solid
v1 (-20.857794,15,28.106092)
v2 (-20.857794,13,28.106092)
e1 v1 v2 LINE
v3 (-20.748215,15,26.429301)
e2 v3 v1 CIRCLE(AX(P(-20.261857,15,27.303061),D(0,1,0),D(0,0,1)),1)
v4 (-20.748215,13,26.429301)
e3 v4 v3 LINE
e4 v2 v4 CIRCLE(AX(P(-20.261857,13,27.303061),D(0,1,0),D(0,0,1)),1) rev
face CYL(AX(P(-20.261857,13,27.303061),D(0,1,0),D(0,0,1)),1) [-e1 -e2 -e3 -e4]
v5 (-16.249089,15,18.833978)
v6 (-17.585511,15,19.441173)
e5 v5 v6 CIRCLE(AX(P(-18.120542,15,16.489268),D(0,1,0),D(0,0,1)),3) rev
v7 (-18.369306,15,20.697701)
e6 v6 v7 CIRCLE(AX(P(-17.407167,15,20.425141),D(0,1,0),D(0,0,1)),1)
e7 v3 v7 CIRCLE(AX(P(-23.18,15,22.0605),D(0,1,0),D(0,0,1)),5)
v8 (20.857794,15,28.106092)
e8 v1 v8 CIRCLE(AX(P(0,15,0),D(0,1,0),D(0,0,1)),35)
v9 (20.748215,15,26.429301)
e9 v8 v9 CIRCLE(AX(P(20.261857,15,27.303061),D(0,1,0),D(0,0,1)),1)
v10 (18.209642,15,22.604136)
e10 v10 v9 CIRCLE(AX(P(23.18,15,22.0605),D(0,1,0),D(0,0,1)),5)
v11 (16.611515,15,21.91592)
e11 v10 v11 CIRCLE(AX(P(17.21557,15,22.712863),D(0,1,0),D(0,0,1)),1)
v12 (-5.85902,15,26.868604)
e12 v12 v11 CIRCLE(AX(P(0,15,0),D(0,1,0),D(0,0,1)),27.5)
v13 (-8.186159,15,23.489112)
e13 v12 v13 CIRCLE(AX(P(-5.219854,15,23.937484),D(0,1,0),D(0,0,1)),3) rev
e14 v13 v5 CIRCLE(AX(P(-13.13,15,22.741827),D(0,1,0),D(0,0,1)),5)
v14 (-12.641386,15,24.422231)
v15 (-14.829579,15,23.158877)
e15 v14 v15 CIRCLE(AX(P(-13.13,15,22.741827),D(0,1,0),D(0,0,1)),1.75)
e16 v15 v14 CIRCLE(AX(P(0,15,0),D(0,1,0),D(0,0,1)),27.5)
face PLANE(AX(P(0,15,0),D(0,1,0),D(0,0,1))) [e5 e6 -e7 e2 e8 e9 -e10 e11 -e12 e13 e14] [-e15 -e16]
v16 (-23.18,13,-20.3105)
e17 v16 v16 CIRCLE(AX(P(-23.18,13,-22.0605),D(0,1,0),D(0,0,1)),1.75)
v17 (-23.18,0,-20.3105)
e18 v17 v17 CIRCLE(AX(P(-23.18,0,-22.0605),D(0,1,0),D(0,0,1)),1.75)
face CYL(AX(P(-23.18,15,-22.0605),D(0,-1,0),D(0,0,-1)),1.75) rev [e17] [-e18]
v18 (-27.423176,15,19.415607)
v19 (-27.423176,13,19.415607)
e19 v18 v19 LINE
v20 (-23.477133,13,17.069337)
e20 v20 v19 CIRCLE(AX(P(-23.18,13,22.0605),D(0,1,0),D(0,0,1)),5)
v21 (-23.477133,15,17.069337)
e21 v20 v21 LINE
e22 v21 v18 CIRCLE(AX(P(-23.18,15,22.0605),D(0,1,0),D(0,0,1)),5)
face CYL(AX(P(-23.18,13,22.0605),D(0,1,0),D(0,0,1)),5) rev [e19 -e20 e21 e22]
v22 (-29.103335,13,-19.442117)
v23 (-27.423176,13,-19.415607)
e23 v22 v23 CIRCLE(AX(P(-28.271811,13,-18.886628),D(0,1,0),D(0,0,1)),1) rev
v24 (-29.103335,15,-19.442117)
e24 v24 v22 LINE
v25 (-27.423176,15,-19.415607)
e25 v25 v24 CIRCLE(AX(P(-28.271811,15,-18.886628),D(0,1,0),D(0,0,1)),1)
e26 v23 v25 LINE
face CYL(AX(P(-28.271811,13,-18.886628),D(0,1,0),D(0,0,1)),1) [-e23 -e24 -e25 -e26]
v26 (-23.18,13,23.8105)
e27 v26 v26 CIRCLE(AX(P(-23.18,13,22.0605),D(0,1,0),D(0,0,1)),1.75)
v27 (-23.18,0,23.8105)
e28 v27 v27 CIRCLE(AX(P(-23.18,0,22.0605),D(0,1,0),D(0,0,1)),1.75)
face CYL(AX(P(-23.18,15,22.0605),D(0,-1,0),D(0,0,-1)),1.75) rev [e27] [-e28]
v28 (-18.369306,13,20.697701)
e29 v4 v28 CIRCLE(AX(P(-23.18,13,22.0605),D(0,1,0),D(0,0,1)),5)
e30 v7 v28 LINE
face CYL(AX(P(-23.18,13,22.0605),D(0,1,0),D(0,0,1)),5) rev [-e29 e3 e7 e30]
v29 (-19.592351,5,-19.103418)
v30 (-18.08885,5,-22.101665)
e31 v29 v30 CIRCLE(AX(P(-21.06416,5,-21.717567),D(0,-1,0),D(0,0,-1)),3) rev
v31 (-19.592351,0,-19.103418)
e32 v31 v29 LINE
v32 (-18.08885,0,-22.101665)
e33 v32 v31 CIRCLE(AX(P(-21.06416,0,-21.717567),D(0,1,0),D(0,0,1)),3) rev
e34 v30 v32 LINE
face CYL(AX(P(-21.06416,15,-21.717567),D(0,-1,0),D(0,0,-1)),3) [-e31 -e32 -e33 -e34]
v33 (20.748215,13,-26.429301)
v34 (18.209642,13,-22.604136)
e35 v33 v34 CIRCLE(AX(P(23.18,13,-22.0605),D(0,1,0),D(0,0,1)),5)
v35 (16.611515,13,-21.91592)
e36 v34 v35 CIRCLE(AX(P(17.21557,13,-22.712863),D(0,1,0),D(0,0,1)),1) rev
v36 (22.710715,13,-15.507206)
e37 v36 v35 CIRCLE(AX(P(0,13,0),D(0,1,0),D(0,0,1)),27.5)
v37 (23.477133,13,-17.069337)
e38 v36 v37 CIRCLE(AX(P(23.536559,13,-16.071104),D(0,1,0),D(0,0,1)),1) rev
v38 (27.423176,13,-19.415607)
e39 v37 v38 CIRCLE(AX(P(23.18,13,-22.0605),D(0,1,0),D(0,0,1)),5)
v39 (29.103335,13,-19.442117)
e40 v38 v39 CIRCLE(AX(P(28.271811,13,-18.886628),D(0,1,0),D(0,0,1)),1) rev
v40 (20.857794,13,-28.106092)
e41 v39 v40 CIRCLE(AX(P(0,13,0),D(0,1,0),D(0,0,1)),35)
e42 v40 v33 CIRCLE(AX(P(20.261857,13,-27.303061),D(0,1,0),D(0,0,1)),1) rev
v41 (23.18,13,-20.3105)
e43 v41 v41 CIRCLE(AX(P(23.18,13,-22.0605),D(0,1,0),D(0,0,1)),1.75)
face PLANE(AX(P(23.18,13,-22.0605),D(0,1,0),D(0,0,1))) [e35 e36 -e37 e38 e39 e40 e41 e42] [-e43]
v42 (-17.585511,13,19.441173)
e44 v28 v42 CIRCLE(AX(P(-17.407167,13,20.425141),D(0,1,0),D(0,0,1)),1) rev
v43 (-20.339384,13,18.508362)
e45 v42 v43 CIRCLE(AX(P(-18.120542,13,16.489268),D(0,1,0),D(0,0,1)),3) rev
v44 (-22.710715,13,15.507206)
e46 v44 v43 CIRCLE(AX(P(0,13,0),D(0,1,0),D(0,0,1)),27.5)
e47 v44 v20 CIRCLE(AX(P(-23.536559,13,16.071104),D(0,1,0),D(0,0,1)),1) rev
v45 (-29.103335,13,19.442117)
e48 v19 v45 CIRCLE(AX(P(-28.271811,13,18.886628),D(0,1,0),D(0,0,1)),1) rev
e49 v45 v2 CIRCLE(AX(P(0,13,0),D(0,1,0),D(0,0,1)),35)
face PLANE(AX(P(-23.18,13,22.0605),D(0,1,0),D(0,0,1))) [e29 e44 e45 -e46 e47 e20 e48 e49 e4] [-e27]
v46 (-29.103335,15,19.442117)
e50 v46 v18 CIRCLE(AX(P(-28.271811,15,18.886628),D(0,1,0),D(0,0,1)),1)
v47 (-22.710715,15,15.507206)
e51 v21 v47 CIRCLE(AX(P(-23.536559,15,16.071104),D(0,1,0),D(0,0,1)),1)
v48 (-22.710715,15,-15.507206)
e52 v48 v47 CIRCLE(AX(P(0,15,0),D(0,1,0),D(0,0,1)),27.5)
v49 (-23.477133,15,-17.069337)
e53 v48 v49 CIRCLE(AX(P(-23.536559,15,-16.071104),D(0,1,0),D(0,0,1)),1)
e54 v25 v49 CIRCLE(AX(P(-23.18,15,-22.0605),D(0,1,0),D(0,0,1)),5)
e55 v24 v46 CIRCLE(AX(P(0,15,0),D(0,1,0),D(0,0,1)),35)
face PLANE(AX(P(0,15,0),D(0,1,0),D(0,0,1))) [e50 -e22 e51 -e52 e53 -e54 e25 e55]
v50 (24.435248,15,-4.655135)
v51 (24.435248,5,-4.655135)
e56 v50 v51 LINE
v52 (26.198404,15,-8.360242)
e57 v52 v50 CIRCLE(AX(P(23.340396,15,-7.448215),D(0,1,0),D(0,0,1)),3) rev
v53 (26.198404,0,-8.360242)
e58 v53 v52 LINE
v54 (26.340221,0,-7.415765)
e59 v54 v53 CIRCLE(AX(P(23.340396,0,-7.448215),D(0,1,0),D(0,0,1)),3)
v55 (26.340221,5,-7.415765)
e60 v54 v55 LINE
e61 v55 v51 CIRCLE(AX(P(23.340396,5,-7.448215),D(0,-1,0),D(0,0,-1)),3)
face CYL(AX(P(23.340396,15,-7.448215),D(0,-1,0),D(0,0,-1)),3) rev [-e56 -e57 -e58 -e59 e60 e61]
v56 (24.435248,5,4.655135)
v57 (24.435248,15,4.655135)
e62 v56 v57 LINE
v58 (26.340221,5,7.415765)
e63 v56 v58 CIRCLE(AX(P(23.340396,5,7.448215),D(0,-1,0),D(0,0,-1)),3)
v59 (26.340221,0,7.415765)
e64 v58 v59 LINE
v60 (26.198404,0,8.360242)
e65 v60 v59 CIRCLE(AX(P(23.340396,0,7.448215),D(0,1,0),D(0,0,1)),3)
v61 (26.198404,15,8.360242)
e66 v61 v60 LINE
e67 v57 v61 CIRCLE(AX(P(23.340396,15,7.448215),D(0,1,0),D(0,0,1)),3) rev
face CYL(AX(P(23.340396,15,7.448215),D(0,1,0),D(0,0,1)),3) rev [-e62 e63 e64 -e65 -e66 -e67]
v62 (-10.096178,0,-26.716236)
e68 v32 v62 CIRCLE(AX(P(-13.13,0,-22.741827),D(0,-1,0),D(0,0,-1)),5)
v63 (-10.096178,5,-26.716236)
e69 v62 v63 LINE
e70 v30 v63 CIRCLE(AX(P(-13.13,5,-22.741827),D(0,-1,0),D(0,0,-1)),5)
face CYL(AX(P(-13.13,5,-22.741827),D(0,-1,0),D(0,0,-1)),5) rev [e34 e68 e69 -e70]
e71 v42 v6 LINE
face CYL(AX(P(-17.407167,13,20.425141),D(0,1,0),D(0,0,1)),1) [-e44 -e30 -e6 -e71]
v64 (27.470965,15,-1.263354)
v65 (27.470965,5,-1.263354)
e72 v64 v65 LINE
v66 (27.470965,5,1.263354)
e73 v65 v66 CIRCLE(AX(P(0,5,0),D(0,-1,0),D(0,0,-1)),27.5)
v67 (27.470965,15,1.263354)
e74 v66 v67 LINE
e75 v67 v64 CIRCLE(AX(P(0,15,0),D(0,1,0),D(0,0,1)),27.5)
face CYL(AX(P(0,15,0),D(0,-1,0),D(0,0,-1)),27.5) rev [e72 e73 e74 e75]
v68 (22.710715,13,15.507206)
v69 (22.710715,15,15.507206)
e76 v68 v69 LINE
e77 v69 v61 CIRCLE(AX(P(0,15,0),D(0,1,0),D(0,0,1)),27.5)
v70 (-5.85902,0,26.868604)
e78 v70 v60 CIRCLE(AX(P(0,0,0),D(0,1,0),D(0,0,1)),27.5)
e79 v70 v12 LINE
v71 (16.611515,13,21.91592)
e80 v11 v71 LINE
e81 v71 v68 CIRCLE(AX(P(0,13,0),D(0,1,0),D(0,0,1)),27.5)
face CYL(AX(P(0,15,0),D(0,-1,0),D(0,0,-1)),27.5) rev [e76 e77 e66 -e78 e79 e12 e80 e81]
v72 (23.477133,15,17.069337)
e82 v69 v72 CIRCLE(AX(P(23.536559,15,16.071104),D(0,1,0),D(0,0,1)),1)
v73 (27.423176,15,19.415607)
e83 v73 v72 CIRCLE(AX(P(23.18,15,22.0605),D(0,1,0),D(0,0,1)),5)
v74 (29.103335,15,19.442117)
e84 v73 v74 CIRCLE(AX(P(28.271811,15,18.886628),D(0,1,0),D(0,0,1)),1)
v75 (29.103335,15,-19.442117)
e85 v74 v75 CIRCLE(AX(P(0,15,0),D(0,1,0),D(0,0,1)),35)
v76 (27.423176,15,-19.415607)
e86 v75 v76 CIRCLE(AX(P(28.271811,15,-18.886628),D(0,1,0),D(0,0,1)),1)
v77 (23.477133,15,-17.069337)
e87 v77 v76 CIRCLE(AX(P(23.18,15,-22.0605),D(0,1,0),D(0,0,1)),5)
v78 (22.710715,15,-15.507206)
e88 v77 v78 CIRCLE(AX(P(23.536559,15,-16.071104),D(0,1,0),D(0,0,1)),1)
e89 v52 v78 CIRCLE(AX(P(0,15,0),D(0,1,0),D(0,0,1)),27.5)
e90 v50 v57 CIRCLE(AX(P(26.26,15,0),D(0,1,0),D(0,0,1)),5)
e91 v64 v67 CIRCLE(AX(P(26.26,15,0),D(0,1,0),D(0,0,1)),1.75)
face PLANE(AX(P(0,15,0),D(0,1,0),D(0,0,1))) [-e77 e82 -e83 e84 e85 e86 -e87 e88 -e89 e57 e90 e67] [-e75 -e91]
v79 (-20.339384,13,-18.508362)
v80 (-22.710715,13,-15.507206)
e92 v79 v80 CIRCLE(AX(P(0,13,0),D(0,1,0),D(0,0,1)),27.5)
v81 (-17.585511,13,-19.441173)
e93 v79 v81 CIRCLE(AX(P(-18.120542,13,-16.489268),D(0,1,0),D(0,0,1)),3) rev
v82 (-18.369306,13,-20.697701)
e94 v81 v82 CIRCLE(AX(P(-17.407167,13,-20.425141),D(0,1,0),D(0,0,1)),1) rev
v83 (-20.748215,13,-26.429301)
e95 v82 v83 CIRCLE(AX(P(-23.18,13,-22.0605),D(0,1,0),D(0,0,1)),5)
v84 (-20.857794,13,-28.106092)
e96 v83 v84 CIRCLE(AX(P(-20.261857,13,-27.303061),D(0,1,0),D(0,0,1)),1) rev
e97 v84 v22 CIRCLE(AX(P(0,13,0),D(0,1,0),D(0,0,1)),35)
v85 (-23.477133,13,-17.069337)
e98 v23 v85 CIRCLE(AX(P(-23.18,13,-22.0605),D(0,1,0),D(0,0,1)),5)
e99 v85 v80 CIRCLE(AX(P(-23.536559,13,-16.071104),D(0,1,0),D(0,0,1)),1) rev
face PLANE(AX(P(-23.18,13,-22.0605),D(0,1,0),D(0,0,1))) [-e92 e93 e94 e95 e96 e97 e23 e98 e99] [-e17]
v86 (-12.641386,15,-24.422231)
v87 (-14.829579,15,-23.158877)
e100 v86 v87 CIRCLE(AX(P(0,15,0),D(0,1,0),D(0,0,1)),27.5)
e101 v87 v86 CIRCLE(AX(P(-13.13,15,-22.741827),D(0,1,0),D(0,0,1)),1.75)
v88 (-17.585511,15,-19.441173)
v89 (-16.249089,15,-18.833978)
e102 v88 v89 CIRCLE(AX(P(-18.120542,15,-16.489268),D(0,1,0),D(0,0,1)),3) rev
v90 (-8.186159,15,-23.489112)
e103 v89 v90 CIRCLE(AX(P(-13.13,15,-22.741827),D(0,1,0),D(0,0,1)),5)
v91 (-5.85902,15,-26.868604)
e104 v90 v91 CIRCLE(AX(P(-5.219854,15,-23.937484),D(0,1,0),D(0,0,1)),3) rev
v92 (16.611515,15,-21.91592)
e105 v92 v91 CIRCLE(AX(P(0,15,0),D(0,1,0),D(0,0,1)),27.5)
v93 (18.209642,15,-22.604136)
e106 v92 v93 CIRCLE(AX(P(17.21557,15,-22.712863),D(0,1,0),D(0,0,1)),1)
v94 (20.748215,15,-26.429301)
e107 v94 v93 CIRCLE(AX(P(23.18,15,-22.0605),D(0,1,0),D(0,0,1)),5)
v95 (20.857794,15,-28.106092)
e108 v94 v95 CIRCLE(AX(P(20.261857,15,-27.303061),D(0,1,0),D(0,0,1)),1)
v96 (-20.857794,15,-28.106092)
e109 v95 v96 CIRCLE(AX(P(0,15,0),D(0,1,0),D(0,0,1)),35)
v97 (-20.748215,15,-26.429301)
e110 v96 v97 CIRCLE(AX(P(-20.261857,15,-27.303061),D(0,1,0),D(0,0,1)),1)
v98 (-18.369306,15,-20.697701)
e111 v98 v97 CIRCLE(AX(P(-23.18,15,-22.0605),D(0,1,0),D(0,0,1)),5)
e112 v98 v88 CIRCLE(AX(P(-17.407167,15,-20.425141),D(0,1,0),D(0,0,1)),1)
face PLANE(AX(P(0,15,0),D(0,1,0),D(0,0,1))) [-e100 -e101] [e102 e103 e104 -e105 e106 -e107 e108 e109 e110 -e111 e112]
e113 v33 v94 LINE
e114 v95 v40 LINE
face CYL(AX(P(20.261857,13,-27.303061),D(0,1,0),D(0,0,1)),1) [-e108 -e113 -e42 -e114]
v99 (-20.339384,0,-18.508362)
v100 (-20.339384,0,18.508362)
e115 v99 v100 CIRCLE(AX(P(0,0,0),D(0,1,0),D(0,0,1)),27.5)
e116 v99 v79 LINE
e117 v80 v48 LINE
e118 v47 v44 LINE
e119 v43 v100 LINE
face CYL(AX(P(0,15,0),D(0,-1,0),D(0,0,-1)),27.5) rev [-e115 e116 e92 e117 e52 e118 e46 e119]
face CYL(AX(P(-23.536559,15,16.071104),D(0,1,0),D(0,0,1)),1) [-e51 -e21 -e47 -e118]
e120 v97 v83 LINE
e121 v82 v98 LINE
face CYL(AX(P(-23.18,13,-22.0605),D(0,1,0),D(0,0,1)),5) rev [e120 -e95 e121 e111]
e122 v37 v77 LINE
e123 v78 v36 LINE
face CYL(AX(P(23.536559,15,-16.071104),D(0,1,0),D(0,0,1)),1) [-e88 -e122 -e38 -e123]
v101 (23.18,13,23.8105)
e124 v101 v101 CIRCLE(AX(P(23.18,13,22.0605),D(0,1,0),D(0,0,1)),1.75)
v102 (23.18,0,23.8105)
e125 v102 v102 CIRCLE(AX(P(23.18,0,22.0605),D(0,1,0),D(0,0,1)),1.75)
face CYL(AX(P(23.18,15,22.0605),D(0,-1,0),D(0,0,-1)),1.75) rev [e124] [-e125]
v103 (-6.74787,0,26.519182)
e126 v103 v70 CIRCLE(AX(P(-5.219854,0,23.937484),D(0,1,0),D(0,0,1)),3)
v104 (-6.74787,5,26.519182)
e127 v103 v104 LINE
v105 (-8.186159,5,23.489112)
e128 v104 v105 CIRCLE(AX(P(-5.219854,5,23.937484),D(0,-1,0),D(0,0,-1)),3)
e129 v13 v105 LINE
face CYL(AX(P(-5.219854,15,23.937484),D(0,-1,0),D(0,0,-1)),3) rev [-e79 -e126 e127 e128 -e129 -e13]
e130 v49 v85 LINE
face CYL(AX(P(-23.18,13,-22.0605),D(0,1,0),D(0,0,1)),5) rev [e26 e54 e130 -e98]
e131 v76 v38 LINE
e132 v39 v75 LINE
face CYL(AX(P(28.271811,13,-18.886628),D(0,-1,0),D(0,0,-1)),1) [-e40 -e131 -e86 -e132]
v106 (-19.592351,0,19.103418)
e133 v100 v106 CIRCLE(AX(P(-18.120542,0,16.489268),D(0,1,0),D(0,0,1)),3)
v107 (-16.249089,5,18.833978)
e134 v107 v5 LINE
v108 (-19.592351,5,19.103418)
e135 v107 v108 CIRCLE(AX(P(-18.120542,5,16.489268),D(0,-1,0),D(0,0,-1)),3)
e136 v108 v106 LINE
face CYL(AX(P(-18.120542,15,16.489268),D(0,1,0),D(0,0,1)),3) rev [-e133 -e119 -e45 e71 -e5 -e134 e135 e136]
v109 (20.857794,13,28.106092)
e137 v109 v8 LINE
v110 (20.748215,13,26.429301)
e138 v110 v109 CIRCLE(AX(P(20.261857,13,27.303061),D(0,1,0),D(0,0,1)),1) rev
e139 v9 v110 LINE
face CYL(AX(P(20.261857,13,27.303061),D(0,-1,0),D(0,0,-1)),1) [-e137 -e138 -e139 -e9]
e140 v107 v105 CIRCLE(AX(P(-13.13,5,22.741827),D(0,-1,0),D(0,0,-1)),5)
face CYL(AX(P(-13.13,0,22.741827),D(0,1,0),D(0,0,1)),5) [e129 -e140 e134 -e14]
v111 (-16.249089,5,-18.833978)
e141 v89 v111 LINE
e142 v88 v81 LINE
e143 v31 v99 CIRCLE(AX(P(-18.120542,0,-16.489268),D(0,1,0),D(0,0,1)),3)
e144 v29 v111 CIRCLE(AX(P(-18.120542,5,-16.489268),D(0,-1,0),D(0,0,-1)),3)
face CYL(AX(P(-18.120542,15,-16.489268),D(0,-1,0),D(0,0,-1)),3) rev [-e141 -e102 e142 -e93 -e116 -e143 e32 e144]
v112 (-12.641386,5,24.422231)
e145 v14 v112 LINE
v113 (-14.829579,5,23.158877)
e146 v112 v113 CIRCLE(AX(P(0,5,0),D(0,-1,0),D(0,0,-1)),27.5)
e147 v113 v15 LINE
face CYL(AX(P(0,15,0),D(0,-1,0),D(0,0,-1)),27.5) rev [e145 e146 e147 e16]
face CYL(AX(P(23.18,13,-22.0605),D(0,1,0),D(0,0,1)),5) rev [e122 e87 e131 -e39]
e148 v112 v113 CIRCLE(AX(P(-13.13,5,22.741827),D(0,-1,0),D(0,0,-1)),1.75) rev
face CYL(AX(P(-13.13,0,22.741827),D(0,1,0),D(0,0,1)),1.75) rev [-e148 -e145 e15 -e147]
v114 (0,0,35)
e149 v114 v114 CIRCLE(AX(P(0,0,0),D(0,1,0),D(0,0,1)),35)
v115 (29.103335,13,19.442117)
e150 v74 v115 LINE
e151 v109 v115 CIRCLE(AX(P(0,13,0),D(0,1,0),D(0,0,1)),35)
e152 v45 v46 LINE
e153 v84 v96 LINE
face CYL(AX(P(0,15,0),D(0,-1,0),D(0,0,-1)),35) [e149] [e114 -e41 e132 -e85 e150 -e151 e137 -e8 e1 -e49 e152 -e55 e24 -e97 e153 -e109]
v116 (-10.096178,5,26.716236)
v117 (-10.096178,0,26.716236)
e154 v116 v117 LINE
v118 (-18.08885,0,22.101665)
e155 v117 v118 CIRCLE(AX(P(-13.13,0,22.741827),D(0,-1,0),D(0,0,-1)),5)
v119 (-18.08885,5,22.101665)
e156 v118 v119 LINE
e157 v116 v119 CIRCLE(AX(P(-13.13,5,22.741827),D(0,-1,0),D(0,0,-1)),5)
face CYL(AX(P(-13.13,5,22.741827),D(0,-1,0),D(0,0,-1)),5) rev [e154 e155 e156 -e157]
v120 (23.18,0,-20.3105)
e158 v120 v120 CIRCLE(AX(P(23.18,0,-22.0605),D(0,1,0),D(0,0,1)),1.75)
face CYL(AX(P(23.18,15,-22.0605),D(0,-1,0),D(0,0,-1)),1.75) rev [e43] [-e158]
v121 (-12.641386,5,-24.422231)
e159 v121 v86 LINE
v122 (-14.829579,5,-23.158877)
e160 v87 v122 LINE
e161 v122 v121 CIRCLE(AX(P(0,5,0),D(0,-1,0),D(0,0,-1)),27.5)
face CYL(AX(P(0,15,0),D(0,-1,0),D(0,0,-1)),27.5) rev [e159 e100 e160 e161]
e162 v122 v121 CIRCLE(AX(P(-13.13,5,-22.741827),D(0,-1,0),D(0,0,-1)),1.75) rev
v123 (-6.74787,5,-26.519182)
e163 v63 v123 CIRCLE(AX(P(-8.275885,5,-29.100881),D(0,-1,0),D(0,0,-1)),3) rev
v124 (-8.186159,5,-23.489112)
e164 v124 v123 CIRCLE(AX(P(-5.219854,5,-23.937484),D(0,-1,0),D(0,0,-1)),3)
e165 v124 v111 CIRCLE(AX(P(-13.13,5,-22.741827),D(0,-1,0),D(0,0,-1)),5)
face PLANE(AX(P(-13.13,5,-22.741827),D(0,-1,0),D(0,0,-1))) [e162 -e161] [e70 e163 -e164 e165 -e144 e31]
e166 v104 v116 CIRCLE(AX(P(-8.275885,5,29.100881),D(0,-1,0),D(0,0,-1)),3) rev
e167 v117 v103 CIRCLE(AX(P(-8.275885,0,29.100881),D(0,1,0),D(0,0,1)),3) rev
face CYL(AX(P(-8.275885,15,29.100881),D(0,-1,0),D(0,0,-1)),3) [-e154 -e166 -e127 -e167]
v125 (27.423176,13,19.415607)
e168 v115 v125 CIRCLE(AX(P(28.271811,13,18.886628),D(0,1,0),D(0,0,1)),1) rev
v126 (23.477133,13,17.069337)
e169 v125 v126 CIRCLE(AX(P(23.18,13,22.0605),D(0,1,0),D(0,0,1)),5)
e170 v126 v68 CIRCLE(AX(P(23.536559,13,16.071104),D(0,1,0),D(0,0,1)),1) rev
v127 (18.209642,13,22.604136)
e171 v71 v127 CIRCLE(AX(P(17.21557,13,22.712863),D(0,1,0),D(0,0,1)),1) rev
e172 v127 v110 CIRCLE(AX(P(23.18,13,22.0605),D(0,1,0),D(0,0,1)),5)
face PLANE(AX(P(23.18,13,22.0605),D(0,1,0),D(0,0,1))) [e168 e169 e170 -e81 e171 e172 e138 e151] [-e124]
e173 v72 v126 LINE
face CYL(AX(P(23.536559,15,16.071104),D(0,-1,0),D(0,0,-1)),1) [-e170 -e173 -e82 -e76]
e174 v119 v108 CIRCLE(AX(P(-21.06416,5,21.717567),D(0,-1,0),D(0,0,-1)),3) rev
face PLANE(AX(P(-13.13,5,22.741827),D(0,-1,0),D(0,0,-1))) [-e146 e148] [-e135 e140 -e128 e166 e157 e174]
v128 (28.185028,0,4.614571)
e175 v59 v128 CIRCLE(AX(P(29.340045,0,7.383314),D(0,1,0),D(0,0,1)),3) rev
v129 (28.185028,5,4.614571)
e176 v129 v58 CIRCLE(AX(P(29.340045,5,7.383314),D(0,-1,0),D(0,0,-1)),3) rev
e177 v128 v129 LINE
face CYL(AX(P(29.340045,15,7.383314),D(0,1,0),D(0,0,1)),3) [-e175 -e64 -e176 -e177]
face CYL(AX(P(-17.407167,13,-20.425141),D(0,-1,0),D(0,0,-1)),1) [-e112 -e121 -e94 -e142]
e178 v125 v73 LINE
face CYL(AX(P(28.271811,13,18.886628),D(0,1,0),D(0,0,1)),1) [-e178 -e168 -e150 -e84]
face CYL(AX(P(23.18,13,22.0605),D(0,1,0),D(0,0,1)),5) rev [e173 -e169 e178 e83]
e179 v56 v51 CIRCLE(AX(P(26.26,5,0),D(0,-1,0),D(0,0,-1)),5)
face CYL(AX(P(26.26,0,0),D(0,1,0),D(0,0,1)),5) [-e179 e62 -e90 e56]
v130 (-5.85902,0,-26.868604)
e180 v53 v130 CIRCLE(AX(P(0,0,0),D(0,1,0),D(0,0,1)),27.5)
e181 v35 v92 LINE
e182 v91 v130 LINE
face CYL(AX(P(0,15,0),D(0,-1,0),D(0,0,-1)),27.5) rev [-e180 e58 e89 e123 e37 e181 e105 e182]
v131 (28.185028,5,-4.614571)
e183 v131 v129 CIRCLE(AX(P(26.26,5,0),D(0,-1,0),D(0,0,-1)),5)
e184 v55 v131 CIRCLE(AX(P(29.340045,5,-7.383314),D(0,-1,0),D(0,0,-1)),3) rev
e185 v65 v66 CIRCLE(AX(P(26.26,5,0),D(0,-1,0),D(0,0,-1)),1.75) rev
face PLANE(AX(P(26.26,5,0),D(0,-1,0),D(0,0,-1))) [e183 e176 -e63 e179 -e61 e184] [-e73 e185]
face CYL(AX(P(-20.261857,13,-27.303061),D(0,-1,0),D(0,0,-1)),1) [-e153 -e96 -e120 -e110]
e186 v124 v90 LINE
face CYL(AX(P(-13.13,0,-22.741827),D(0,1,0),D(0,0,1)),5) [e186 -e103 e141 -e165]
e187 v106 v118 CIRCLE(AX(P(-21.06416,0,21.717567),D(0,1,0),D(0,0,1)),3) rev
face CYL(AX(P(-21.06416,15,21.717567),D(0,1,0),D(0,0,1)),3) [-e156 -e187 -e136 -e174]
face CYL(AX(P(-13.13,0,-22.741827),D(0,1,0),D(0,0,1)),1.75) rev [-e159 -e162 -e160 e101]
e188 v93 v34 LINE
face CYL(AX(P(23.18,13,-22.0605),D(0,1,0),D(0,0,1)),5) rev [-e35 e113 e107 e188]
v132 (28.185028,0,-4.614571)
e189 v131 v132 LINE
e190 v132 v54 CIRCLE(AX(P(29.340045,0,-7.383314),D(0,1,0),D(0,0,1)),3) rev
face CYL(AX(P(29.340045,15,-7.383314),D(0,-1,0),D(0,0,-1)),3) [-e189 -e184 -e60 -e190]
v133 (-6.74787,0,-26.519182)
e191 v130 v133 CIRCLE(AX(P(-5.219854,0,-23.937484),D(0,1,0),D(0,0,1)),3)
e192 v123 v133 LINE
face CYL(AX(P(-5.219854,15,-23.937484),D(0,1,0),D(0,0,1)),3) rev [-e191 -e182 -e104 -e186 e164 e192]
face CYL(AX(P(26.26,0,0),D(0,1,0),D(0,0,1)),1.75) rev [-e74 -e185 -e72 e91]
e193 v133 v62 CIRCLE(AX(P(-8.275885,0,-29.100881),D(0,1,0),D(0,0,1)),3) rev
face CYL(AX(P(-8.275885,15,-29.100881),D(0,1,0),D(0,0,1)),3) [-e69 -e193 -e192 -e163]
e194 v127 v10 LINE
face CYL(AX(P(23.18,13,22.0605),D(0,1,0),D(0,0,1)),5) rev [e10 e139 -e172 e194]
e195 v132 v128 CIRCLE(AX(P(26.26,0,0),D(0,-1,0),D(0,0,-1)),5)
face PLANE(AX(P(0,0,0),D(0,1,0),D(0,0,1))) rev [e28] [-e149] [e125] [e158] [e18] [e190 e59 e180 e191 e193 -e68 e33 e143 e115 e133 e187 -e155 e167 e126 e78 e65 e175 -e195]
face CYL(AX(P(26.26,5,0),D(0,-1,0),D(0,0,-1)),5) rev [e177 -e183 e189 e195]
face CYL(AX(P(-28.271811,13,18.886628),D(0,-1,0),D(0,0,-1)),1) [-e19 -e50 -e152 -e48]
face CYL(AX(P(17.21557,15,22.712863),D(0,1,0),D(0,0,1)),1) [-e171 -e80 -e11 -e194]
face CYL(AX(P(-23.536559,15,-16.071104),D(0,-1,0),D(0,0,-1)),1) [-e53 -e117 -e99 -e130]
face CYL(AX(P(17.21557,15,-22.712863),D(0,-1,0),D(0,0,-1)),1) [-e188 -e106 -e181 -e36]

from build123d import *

# Parameters (mm, degrees)
SKETCH_1_R          = 35
SKETCH_1_R_2        = 1.75
SKETCH_1_R_3        = 27.5
EXTRUDE_1_DEPTH     = 15
SKETCH_2_R          = 5
SKETCH_2_R_2        = 1.75
EXTRUDE_2_DEPTH     = 15
FILLET_1_R          = 3
SKETCH_3_R          = 5
CUT_EXTRUDE_1_DEPTH = 2
CUT_EXTRUDE_START   = -5
SKETCH_4_R          = 5
CUT_EXTRUDE_2_DEPTH = 5
FILLET_2_DEPTH      = 5
FILLET_3_R          = 1


with BuildPart() as part:
    # Эскиз1 → Бобышка-Вытянуть1 (new body)
    with BuildSketch(Plane(origin=(0, 0, 0), x_dir=(1, 0, 0), z_dir=(0, 1, 0))):
        with Locations(Location((0, 0, 0), (0, 0, 270))):
            Circle(SKETCH_1_R)
        with Locations(Location((-23.18, 22.0605, 0), (0, 0, 270))):
            Circle(SKETCH_1_R_2, mode=Mode.SUBTRACT)
        with Locations(Location((23.18, 22.0605, 0), (0, 0, 270))):
            Circle(SKETCH_1_R_2, mode=Mode.SUBTRACT)
        with Locations(Location((23.18, -22.0605, 0), (0, 0, 270))):
            Circle(SKETCH_1_R_2, mode=Mode.SUBTRACT)
        with Locations(Location((-23.18, -22.0605, 0), (0, 0, 270))):
            Circle(SKETCH_1_R_2, mode=Mode.SUBTRACT)
        with Locations(Location((0, 0, 0), (0, 0, 270))):
            Circle(SKETCH_1_R_3, mode=Mode.SUBTRACT)
    extrude(amount=EXTRUDE_1_DEPTH)

    # Эскиз2 → Бобышка-Вытянуть2 (add)
    # profile 1 of 3: a face of its own
    with BuildSketch(Plane(origin=(0, 15, 0), x_dir=(1, 0, 0), z_dir=(0, 1, 0))):
        with Locations((-13.13, 22.741827103)):
            Circle(SKETCH_2_R)
        with Locations((-13.13, 22.741827103)):
            Circle(SKETCH_2_R_2, mode=Mode.SUBTRACT)
    # profile 2 of 3: a face of its own
    with BuildSketch(Plane(origin=(0, 15, 0), x_dir=(1, 0, 0), z_dir=(0, 1, 0))):
        with Locations((26.26, 0)):
            Circle(SKETCH_2_R)
        with Locations((26.26, 0)):
            Circle(SKETCH_2_R_2, mode=Mode.SUBTRACT)
    # profile 3 of 3: a face of its own
    with BuildSketch(Plane(origin=(0, 15, 0), x_dir=(1, 0, 0), z_dir=(0, 1, 0))):
        with Locations((-13.13, -22.741827103)):
            Circle(SKETCH_2_R)
        with Locations((-13.13, -22.741827103)):
            Circle(SKETCH_2_R_2, mode=Mode.SUBTRACT)
    extrude(amount=-EXTRUDE_2_DEPTH)

    # Скругление1
    fillet_1_edges = [part.edges().sort_by_distance(p)[0] for p in [
        (27.053267327, 7.5, -4.936671647),
        (27.053267327, 7.5, 4.936671647),
        (-17.80191672, 7.5, -20.960480937),
        (-9.251350607, 7.5, -25.897152584),
        (-9.251350607, 7.5, 25.897152584),
        (-17.80191672, 7.5, 20.960480937),
    ]]
    fillet(fillet_1_edges, radius=FILLET_1_R)

    # Эскиз3 → Вырез-Вытянуть1 (cut)
    with BuildSketch(Plane(origin=(0, 15, 0), x_dir=(1, 0, 0), z_dir=(0, 1, 0))):
        with Locations((-23.18, 22.0605)):
            Circle(SKETCH_3_R)
        with Locations((23.18, 22.0605)):
            Circle(SKETCH_3_R)
        with Locations((23.18, -22.0605)):
            Circle(SKETCH_3_R)
        with Locations((-23.18, -22.0605)):
            Circle(SKETCH_3_R)
    extrude(amount=-CUT_EXTRUDE_1_DEPTH, mode=Mode.SUBTRACT)

    # Эскиз4 → Вырез-Вытянуть2 (cut)
    with BuildSketch(Plane.XZ.offset(CUT_EXTRUDE_START)):
        with Locations((-13.13, 22.741827103)):
            Circle(SKETCH_4_R)
        with Locations((26.26, 0)):
            Circle(SKETCH_4_R)
        with Locations((-13.13, -22.741827103)):
            Circle(SKETCH_4_R)
    extrude(amount=CUT_EXTRUDE_2_DEPTH, mode=Mode.SUBTRACT)

    # Скругление2: read off the stored shape, not the designer's step
    # Скругление2 outline → Скругление2 (cut)
    with BuildSketch(Plane(origin=(0, 0, 0), x_dir=(1, 0, 0), z_dir=(0, 1, 0))):
        with BuildLine():
            ThreePointArc((-16.249088608, 18.83397779), (-17.48691602, 20.288812061), (-18.08884989, 22.101664805))
            ThreePointArc((-18.08884989, 22.101664805), (-18.38244619, 20.372795331), (-19.592350799, 19.103417814))
            ThreePointArc((-19.592350799, 19.103417814), (-17.87954729, 19.479572812), (-16.249088608, 18.83397779))
        make_face()
        with BuildLine():
            ThreePointArc((-6.747869727, 26.519182418), (-8.452135208, 26.10606305), (-10.096178242, 26.716235932))
            ThreePointArc((-10.096178242, 26.716235932), (-8.827168648, 25.288519537), (-8.186158917, 23.489112418))
            ThreePointArc((-8.186158917, 23.489112418), (-7.930031265, 25.223928567), (-6.747869727, 26.519182418))
        make_face()
        with BuildLine():
            ThreePointArc((24.435247525, 4.655134628), (26.314084667, 4.999707476), (28.185028132, 4.614571128))
            ThreePointArc((28.185028132, 4.614571128), (26.834581398, 5.733267719), (26.340220525, 7.415764604))
            ThreePointArc((26.340220525, 7.415764604), (25.809578555, 5.744355755), (24.435247525, 4.655134628))
        make_face()
        with BuildLine():
            ThreePointArc((26.340220525, -7.415764604), (26.834581398, -5.733267719), (28.185028132, -4.614571128))
            ThreePointArc((28.185028132, -4.614571128), (26.314084667, -4.999707476), (24.435247525, -4.655134628))
            ThreePointArc((24.435247525, -4.655134628), (25.809578555, -5.744355755), (26.340220525, -7.415764604))
        make_face()
        with BuildLine():
            ThreePointArc((-8.186158917, -23.489112418), (-8.827168648, -25.288519537), (-10.096178242, -26.716235932))
            ThreePointArc((-10.096178242, -26.716235932), (-8.452135208, -26.10606305), (-6.747869727, -26.519182418))
            ThreePointArc((-6.747869727, -26.519182418), (-7.930031265, -25.223928567), (-8.186158917, -23.489112418))
        make_face()
        with BuildLine():
            ThreePointArc((-19.592350799, -19.103417814), (-18.38244619, -20.372795331), (-18.08884989, -22.101664805))
            ThreePointArc((-18.08884989, -22.101664805), (-17.48691602, -20.288812061), (-16.249088608, -18.83397779))
            ThreePointArc((-16.249088608, -18.83397779), (-17.87954729, -19.479572812), (-19.592350799, -19.103417814))
        make_face()
    extrude(amount=FILLET_2_DEPTH, mode=Mode.SUBTRACT)

    # Скругление3
    fillet_3_edges = [part.edges().sort_by_distance(p)[0] for p in [
        (-18.967333591, 14, -19.36727856),
        (-18.967333591, 14, 19.36727856),
        (21.259108635, 14, 17.444205342),
        (18.474346617, 14, 20.370285149),
        (22.293687033, 14, -26.981317953),
        (28.050957484, 14, -20.931884393),
        (-21.259108635, 14, 17.444205342),
        (-28.050957484, 14, 20.931884393),
        (-22.293687033, 14, 26.981317953),
        (22.293687033, 14, 26.981317953),
        (28.050957484, 14, 20.931884393),
        (21.259108635, 14, -17.444205342),
        (18.474346617, 14, -20.370285149),
        (-21.259108635, 14, -17.444205342),
        (-22.293687033, 14, -26.981317953),
        (-28.050957484, 14, -20.931884393),
    ]]
    fillet(fillet_3_edges, radius=FILLET_3_R)


solid = part.part
